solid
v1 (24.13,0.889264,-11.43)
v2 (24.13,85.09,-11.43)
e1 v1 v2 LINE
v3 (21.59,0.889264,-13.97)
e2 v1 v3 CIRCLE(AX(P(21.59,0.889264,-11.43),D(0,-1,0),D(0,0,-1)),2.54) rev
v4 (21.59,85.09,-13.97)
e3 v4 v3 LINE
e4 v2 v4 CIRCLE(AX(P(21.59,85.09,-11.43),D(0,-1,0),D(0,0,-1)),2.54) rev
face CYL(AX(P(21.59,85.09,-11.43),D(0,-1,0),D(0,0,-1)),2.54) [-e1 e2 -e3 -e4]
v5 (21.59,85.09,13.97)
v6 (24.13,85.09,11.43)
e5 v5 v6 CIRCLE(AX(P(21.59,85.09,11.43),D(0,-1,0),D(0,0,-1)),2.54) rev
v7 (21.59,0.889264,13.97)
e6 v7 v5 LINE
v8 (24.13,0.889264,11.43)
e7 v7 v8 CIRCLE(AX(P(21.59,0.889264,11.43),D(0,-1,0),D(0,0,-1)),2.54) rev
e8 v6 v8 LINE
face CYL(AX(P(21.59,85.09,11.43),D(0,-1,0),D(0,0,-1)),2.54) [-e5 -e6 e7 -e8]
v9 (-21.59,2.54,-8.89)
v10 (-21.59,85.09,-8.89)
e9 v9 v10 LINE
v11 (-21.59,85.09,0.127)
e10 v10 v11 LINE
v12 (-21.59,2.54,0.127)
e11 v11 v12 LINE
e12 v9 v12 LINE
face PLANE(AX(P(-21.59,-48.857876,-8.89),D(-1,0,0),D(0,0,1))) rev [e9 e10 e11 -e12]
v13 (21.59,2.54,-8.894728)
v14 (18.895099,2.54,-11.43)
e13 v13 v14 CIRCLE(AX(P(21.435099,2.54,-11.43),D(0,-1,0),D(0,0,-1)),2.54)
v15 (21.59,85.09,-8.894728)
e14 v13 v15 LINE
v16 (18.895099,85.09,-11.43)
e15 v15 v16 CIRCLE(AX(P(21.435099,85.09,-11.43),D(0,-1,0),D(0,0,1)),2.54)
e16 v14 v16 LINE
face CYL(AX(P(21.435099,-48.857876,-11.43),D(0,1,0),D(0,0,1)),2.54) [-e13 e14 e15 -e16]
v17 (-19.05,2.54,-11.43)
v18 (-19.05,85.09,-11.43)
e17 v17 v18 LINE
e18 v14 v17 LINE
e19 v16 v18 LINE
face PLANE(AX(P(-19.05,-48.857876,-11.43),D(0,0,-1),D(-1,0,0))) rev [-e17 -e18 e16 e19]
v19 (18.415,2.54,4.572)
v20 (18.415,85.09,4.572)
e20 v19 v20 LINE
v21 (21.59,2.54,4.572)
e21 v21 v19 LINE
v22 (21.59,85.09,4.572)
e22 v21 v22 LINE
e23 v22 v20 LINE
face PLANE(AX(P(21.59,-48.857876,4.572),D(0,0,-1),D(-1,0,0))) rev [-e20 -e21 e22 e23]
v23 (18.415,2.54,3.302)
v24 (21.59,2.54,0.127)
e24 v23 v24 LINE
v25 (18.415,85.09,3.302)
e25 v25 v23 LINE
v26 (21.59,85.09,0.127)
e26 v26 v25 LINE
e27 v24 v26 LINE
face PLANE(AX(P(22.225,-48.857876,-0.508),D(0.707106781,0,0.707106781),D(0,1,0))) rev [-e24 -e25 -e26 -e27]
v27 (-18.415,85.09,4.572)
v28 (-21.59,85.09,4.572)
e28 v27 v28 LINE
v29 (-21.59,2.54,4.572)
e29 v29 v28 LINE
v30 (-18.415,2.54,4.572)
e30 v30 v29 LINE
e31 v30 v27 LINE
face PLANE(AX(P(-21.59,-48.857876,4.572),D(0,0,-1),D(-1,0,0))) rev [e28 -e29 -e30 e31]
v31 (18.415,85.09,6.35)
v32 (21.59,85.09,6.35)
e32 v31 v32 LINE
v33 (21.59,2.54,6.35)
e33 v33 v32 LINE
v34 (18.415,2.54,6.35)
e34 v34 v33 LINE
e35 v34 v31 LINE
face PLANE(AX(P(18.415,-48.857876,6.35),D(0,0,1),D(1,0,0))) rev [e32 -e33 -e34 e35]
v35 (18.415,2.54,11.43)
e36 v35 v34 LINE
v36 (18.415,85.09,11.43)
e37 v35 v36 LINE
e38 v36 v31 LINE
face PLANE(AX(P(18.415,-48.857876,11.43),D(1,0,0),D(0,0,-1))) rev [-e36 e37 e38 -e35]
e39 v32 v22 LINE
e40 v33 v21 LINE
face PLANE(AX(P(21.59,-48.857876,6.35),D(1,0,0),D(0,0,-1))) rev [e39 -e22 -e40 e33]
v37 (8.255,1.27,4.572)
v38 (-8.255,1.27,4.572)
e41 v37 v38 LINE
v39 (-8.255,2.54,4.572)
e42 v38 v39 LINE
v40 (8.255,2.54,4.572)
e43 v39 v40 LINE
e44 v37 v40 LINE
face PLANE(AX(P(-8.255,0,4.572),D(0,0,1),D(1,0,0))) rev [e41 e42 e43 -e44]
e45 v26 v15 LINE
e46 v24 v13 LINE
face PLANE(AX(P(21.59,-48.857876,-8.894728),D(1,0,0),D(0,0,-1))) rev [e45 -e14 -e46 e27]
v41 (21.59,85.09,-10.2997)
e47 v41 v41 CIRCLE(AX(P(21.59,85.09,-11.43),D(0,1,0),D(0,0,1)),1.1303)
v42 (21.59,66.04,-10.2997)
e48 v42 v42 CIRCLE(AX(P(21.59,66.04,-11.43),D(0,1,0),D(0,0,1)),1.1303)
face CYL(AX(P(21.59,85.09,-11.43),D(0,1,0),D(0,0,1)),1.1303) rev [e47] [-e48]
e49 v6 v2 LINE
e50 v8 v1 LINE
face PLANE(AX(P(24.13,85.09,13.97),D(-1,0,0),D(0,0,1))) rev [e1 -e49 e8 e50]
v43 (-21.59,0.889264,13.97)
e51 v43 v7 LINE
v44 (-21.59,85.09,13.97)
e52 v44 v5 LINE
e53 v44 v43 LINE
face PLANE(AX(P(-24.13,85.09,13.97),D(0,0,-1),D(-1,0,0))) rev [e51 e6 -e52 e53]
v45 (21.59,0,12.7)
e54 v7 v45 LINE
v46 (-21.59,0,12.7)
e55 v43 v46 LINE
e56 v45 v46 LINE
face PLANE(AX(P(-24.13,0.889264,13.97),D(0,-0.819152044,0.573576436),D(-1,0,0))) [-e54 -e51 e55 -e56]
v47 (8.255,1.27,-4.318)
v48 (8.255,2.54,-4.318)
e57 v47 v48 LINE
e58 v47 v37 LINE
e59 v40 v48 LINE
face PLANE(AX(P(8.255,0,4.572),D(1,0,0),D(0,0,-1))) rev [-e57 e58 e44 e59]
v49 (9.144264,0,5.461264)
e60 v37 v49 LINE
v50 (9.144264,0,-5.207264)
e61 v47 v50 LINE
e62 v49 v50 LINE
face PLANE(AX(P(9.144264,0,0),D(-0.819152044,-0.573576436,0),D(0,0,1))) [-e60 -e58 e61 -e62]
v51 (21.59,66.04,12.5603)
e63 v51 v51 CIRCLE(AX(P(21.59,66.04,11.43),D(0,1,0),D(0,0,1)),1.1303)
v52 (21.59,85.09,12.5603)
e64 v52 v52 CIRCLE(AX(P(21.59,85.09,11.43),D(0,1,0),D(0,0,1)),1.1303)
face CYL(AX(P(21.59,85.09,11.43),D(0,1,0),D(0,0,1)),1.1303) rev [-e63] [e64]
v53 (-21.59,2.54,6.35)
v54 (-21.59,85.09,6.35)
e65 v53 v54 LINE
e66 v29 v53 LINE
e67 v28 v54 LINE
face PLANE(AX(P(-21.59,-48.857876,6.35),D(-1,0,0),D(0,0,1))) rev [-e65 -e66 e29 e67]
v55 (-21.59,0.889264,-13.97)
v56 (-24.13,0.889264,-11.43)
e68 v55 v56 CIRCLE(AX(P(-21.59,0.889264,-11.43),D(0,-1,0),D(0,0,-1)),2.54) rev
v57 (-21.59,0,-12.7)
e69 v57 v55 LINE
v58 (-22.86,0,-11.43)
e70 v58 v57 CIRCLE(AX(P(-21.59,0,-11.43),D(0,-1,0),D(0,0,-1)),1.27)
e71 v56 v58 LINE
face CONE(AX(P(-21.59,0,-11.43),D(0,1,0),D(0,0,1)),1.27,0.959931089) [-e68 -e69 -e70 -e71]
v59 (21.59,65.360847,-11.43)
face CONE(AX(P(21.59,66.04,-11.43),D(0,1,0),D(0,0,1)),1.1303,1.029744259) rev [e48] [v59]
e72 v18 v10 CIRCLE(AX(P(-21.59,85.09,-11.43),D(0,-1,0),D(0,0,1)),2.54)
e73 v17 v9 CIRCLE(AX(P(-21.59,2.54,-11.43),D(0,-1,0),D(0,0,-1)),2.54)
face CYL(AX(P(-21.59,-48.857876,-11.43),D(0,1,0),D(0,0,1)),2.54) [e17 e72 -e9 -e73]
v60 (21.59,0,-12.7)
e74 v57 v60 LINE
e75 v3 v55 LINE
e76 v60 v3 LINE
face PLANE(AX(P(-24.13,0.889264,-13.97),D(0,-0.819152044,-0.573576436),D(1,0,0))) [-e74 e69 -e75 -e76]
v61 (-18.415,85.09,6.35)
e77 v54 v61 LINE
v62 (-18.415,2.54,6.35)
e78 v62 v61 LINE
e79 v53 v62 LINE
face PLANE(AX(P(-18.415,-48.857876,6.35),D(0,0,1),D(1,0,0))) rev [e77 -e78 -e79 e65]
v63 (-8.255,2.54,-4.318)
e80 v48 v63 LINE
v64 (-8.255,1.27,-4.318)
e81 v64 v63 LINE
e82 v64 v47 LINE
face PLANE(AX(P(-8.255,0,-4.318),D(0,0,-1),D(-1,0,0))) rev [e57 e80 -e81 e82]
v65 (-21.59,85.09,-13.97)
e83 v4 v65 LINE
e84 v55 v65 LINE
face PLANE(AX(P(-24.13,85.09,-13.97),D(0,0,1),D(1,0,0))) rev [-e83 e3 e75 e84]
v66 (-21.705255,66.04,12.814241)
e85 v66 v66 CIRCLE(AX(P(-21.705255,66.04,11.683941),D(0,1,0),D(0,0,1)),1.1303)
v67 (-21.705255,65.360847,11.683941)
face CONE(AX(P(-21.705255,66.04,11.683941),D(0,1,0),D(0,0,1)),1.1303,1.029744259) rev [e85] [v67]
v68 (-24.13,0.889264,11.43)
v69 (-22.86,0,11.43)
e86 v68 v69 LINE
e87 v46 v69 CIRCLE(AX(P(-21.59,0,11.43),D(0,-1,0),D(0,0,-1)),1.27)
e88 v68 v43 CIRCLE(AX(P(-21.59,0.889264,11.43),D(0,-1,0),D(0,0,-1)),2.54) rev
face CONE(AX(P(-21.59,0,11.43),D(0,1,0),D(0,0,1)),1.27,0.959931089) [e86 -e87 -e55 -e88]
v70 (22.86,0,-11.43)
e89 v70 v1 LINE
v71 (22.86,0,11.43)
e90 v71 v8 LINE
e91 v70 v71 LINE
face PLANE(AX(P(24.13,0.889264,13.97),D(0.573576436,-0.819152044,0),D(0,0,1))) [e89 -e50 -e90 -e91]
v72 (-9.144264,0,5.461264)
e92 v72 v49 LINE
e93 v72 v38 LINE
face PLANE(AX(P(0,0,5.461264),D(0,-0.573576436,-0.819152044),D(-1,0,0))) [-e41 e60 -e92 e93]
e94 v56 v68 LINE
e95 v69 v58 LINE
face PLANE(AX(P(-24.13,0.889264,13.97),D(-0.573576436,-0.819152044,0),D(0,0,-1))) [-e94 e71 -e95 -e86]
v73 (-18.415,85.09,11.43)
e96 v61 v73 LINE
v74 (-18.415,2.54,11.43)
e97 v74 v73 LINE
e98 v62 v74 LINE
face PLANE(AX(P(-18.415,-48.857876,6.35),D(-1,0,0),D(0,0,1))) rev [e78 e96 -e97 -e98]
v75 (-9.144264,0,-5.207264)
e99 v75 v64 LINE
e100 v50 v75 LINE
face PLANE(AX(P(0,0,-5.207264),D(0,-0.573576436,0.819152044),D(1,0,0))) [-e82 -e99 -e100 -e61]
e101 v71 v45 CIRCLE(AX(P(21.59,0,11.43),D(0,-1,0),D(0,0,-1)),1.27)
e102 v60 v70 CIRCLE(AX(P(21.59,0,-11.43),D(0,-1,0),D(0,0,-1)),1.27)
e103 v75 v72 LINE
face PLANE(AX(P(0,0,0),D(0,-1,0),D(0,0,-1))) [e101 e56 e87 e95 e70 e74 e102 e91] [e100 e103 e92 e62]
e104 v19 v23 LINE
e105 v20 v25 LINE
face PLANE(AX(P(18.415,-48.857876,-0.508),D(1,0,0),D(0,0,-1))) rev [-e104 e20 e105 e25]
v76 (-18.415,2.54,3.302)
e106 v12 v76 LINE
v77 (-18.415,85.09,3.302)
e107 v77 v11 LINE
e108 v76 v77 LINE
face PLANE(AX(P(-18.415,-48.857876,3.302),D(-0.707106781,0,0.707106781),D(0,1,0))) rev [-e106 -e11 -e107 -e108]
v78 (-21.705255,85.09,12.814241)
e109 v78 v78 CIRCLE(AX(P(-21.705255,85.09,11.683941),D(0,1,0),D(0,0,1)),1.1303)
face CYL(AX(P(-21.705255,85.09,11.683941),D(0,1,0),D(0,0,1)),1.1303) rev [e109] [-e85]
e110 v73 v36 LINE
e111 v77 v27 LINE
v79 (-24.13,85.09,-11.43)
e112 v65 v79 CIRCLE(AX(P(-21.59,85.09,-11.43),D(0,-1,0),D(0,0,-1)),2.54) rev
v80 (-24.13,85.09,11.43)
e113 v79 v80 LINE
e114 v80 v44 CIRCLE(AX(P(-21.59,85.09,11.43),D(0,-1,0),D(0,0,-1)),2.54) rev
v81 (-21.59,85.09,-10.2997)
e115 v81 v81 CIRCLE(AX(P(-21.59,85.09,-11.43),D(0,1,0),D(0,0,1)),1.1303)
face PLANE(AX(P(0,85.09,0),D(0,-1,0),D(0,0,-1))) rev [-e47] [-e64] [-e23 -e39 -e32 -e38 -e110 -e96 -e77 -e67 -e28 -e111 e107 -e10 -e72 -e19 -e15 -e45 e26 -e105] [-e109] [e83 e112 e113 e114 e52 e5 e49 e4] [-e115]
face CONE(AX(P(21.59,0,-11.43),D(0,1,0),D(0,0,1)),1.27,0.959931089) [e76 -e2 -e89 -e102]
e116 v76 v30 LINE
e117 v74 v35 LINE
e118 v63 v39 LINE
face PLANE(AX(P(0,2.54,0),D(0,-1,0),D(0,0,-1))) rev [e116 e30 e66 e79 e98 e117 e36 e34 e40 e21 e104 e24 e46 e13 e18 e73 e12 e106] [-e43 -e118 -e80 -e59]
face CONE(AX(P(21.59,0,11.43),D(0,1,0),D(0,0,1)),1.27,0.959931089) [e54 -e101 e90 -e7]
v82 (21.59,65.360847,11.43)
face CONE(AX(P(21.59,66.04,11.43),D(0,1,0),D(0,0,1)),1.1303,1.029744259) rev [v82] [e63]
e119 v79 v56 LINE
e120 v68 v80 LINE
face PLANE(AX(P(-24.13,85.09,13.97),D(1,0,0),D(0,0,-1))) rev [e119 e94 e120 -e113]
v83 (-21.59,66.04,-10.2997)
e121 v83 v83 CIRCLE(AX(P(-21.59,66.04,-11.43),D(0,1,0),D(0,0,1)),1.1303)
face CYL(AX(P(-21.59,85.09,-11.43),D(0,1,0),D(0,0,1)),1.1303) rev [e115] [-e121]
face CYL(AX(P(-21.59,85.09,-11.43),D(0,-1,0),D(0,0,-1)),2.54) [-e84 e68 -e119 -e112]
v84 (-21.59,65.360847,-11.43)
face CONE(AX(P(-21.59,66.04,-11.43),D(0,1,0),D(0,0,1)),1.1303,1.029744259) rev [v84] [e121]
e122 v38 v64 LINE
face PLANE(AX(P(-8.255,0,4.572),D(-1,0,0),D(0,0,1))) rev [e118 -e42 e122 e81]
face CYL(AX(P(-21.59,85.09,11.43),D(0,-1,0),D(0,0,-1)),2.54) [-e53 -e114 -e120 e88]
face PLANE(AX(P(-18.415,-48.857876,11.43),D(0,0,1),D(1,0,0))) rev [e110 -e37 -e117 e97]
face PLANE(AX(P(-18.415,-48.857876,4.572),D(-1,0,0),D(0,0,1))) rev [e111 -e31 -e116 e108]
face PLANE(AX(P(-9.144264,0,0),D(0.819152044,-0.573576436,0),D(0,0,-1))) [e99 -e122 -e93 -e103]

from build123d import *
from OCP.BRepFilletAPI import BRepFilletAPI_MakeChamfer

# Parameters (mm, degrees)
SKETCH1_W                       = 48.26
SKETCH1_H                       = 27.94
BOSS_EXTRUDE1_DEPTH             = 85.09
CUT_EXTRUDE1_DEPTH              = 82.55
F_43_0_089_DIAMETER_HOLE1_D     = 2.2606
F_43_0_089_DIAMETER_HOLE1_DEPTH = 19.05
F_43_0_089_DIAMETER_HOLE1_TIP   = 0.679152758
SKETCH4_W                       = 16.51
SKETCH4_H                       = 8.89
CUT_EXTRUDE2_DEPTH              = 88.13162629
CHAMFER1_SIZE                   = 3.81
FILLET1_R                       = 2.54
CHAMFER2_SIZE                   = 1.27
CHAMFER2_SIZE2                  = 0.889263574


with BuildPart() as part:
    # Sketch1 → Boss-Extrude1 (new body)
    with BuildSketch(Plane(origin=(0, 0, 0), x_dir=(1, 0, 0), z_dir=(0, 1, 0))):
        Rectangle(SKETCH1_W, SKETCH1_H)
    extrude(amount=BOSS_EXTRUDE1_DEPTH)

    # Sketch3 → Cut-Extrude1 (cut)
    with BuildSketch(Plane(origin=(0, 85.09, 0), x_dir=(1, 0, 0), z_dir=(0, 1, 0))):
        with BuildLine():
            Line((21.59, 0.508), (18.415, 0.508))
            Line((18.415, 0.508), (18.415, -4.572))
            Line((18.415, -4.572), (21.59, -4.572))
            Line((21.59, -4.572), (21.59, -6.35))
            Line((21.59, -6.35), (18.415, -6.35))
            Line((18.415, -6.35), (18.415, -11.43))
            Line((18.415, -11.43), (-18.415, -11.43))
            Line((-18.415, -11.43), (-18.415, -6.35))
            Line((-18.415, -6.35), (-21.59, -6.35))
            Line((-21.59, -6.35), (-21.59, -4.572))
            Line((-21.59, -4.572), (-18.415, -4.572))
            Line((-18.415, -4.572), (-18.415, 0.508))
            Line((-18.415, 0.508), (-21.59, 0.508))
            Line((-21.59, 0.508), (-21.59, 8.89))
            ThreePointArc((-21.59, 8.89), (-19.793948776, 9.633948776), (-19.05, 11.43))
            Line((-19.05, 11.43), (18.895098563, 11.43))
            ThreePointArc((18.895098563, 11.43), (19.694674714, 9.57999329), (21.59, 8.894727718))
            Line((21.59, 8.894727718), (21.59, 0.508))
        make_face()
    extrude(amount=-CUT_EXTRUDE1_DEPTH, mode=Mode.SUBTRACT)

    # #43 (0.089) Diameter Hole1
    with Locations(Plane(origin=(0, 85.09, 0), x_dir=(1, 0, 0), z_dir=(0, 1, 0))):
        with Locations((-21.59, 11.43), (21.59, 11.43), (21.59, -11.43), (-21.705255142, -11.683941121)):
            Hole(F_43_0_089_DIAMETER_HOLE1_D / 2, depth=F_43_0_089_DIAMETER_HOLE1_DEPTH)
            with Locations((0, 0, -(F_43_0_089_DIAMETER_HOLE1_DEPTH + F_43_0_089_DIAMETER_HOLE1_TIP / 2))):  # 118° drill point
                Cone(0, F_43_0_089_DIAMETER_HOLE1_D / 2, F_43_0_089_DIAMETER_HOLE1_TIP, mode=Mode.SUBTRACT)

    # Sketch4 → Cut-Extrude2 (cut, through all)
    with BuildSketch(Plane(origin=(0, 2.54, 0), x_dir=(1, 0, 0), z_dir=(0, 1, 0))):
        with Locations((0, -0.127)):
            Rectangle(SKETCH4_W, SKETCH4_H)
    extrude(amount=-CUT_EXTRUDE2_DEPTH, mode=Mode.SUBTRACT)

    # Chamfer1
    # the kernel refuses this chamfer: 3.81 mm, written as the material it takes off along each edge
    with BuildSketch(Plane(origin=(18.415, 94.888112184, -0.508), x_dir=(0.9996219169112968, 0, -0.027495876610586445), z_dir=(0, -1, 0))) as chamfer1_piece_1_section:
        Polygon((CHAMFER1_SIZE * 0.999621916911, CHAMFER1_SIZE * 0.0274958766106), (-CHAMFER1_SIZE * 0.0274958766106, CHAMFER1_SIZE * 0.999621916911), (0, 0), align=None)
    chamfer1_piece_1 = extrude(amount=92.348112184, mode=Mode.PRIVATE)
    chamfer1_piece_1 = split(chamfer1_piece_1, bisect_by=Plane(origin=(21.59, 43.815, 0.792238095), z_dir=(-1, 0, 0)), keep=Keep.TOP, mode=Mode.PRIVATE)
    add(chamfer1_piece_1, mode=Mode.SUBTRACT)
    with BuildSketch(Plane(origin=(-18.415, 94.888112184, -0.508), x_dir=(-0.9996219169112968, 0, -0.027495876610586247), z_dir=(0, -1, 0))) as chamfer1_piece_2_section:
        Polygon((CHAMFER1_SIZE * 0.999621916911, -CHAMFER1_SIZE * 0.0274958766106), (-CHAMFER1_SIZE * 0.0274958766106, -CHAMFER1_SIZE * 0.999621916911), (0, 0), align=None)
    chamfer1_piece_2 = extrude(amount=92.348112184, mode=Mode.PRIVATE)
    chamfer1_piece_2 = split(chamfer1_piece_2, bisect_by=Plane(origin=(-21.59, 43.815, 0.792238095), z_dir=(1, 0, 0)), keep=Keep.TOP, mode=Mode.PRIVATE)
    add(chamfer1_piece_2, mode=Mode.SUBTRACT)

    # Fillet1
    fillet1_edges = [part.edges().sort_by_distance(p)[0] for p in [
        (24.13, 42.545, 13.97),
        (-24.13, 42.545, 13.97),
        (-24.13, 42.545, -13.97),
        (24.13, 42.545, -13.97),
    ]]
    fillet(fillet1_edges, radius=FILLET1_R)

    # Chamfer2: one chamfer whose edges measure the first distance from different faces: ONE call of the kernel's chamfer builder (chamfer() names one face for all edges)
    chamfer2_edges_1 = [part.edges().sort_by_distance(p)[0] for p in [
        (0, 0, 13.97),
        (24.13, 0, 0),
        (-24.13, 0, 0),
        (0, 0, -13.97),
        (-23.386051224, 0, -13.226051224),
        (23.386051224, 0, -13.226051224),
        (23.386051224, 0, 13.226051224),
        (-23.386051224, 0, 13.226051224),
    ]]
    chamfer2_side_1 = [part.faces().sort_by_distance(p)[0] for p in [
        (0, 0, 13.412355741),
    ]]
    chamfer2_edges_2 = [part.edges().sort_by_distance(p)[0] for p in [
        (8.255, 0, 0.127),
    ]]
    chamfer2_side_2 = [part.faces().sort_by_distance(p)[0] for p in [
        (8.255, 1.27, 0.127),
    ]]
    chamfer2_edges_3 = [part.edges().sort_by_distance(p)[0] for p in [
        (0, 0, 4.572),
    ]]
    chamfer2_side_3 = [part.faces().sort_by_distance(p)[0] for p in [
        (0, 1.27, 4.572),
    ]]
    chamfer2_edges_4 = [part.edges().sort_by_distance(p)[0] for p in [
        (-8.255, 0, 0.127),
    ]]
    chamfer2_side_4 = [part.faces().sort_by_distance(p)[0] for p in [
        (-8.255, 1.27, 0.127),
    ]]
    chamfer2_edges_5 = [part.edges().sort_by_distance(p)[0] for p in [
        (0, 0, -4.318),
    ]]
    chamfer2_side_5 = [part.faces().sort_by_distance(p)[0] for p in [
        (0, 1.27, -4.318),
    ]]
    chamfer2 = BRepFilletAPI_MakeChamfer(part.part.solid().wrapped)
    for e in chamfer2_edges_1:
        chamfer2.Add(CHAMFER2_SIZE, CHAMFER2_SIZE2, e.wrapped, chamfer2_side_1[0].wrapped)  # the first distance lies on this face
    for e in chamfer2_edges_2:
        chamfer2.Add(CHAMFER2_SIZE, CHAMFER2_SIZE2, e.wrapped, chamfer2_side_2[0].wrapped)  # the first distance lies on this face
    for e in chamfer2_edges_3:
        chamfer2.Add(CHAMFER2_SIZE, CHAMFER2_SIZE2, e.wrapped, chamfer2_side_3[0].wrapped)  # the first distance lies on this face
    for e in chamfer2_edges_4:
        chamfer2.Add(CHAMFER2_SIZE, CHAMFER2_SIZE2, e.wrapped, chamfer2_side_4[0].wrapped)  # the first distance lies on this face
    for e in chamfer2_edges_5:
        chamfer2.Add(CHAMFER2_SIZE, CHAMFER2_SIZE2, e.wrapped, chamfer2_side_5[0].wrapped)  # the first distance lies on this face
    add(Compound.cast(chamfer2.Shape()), mode=Mode.REPLACE)


solid = part.part
